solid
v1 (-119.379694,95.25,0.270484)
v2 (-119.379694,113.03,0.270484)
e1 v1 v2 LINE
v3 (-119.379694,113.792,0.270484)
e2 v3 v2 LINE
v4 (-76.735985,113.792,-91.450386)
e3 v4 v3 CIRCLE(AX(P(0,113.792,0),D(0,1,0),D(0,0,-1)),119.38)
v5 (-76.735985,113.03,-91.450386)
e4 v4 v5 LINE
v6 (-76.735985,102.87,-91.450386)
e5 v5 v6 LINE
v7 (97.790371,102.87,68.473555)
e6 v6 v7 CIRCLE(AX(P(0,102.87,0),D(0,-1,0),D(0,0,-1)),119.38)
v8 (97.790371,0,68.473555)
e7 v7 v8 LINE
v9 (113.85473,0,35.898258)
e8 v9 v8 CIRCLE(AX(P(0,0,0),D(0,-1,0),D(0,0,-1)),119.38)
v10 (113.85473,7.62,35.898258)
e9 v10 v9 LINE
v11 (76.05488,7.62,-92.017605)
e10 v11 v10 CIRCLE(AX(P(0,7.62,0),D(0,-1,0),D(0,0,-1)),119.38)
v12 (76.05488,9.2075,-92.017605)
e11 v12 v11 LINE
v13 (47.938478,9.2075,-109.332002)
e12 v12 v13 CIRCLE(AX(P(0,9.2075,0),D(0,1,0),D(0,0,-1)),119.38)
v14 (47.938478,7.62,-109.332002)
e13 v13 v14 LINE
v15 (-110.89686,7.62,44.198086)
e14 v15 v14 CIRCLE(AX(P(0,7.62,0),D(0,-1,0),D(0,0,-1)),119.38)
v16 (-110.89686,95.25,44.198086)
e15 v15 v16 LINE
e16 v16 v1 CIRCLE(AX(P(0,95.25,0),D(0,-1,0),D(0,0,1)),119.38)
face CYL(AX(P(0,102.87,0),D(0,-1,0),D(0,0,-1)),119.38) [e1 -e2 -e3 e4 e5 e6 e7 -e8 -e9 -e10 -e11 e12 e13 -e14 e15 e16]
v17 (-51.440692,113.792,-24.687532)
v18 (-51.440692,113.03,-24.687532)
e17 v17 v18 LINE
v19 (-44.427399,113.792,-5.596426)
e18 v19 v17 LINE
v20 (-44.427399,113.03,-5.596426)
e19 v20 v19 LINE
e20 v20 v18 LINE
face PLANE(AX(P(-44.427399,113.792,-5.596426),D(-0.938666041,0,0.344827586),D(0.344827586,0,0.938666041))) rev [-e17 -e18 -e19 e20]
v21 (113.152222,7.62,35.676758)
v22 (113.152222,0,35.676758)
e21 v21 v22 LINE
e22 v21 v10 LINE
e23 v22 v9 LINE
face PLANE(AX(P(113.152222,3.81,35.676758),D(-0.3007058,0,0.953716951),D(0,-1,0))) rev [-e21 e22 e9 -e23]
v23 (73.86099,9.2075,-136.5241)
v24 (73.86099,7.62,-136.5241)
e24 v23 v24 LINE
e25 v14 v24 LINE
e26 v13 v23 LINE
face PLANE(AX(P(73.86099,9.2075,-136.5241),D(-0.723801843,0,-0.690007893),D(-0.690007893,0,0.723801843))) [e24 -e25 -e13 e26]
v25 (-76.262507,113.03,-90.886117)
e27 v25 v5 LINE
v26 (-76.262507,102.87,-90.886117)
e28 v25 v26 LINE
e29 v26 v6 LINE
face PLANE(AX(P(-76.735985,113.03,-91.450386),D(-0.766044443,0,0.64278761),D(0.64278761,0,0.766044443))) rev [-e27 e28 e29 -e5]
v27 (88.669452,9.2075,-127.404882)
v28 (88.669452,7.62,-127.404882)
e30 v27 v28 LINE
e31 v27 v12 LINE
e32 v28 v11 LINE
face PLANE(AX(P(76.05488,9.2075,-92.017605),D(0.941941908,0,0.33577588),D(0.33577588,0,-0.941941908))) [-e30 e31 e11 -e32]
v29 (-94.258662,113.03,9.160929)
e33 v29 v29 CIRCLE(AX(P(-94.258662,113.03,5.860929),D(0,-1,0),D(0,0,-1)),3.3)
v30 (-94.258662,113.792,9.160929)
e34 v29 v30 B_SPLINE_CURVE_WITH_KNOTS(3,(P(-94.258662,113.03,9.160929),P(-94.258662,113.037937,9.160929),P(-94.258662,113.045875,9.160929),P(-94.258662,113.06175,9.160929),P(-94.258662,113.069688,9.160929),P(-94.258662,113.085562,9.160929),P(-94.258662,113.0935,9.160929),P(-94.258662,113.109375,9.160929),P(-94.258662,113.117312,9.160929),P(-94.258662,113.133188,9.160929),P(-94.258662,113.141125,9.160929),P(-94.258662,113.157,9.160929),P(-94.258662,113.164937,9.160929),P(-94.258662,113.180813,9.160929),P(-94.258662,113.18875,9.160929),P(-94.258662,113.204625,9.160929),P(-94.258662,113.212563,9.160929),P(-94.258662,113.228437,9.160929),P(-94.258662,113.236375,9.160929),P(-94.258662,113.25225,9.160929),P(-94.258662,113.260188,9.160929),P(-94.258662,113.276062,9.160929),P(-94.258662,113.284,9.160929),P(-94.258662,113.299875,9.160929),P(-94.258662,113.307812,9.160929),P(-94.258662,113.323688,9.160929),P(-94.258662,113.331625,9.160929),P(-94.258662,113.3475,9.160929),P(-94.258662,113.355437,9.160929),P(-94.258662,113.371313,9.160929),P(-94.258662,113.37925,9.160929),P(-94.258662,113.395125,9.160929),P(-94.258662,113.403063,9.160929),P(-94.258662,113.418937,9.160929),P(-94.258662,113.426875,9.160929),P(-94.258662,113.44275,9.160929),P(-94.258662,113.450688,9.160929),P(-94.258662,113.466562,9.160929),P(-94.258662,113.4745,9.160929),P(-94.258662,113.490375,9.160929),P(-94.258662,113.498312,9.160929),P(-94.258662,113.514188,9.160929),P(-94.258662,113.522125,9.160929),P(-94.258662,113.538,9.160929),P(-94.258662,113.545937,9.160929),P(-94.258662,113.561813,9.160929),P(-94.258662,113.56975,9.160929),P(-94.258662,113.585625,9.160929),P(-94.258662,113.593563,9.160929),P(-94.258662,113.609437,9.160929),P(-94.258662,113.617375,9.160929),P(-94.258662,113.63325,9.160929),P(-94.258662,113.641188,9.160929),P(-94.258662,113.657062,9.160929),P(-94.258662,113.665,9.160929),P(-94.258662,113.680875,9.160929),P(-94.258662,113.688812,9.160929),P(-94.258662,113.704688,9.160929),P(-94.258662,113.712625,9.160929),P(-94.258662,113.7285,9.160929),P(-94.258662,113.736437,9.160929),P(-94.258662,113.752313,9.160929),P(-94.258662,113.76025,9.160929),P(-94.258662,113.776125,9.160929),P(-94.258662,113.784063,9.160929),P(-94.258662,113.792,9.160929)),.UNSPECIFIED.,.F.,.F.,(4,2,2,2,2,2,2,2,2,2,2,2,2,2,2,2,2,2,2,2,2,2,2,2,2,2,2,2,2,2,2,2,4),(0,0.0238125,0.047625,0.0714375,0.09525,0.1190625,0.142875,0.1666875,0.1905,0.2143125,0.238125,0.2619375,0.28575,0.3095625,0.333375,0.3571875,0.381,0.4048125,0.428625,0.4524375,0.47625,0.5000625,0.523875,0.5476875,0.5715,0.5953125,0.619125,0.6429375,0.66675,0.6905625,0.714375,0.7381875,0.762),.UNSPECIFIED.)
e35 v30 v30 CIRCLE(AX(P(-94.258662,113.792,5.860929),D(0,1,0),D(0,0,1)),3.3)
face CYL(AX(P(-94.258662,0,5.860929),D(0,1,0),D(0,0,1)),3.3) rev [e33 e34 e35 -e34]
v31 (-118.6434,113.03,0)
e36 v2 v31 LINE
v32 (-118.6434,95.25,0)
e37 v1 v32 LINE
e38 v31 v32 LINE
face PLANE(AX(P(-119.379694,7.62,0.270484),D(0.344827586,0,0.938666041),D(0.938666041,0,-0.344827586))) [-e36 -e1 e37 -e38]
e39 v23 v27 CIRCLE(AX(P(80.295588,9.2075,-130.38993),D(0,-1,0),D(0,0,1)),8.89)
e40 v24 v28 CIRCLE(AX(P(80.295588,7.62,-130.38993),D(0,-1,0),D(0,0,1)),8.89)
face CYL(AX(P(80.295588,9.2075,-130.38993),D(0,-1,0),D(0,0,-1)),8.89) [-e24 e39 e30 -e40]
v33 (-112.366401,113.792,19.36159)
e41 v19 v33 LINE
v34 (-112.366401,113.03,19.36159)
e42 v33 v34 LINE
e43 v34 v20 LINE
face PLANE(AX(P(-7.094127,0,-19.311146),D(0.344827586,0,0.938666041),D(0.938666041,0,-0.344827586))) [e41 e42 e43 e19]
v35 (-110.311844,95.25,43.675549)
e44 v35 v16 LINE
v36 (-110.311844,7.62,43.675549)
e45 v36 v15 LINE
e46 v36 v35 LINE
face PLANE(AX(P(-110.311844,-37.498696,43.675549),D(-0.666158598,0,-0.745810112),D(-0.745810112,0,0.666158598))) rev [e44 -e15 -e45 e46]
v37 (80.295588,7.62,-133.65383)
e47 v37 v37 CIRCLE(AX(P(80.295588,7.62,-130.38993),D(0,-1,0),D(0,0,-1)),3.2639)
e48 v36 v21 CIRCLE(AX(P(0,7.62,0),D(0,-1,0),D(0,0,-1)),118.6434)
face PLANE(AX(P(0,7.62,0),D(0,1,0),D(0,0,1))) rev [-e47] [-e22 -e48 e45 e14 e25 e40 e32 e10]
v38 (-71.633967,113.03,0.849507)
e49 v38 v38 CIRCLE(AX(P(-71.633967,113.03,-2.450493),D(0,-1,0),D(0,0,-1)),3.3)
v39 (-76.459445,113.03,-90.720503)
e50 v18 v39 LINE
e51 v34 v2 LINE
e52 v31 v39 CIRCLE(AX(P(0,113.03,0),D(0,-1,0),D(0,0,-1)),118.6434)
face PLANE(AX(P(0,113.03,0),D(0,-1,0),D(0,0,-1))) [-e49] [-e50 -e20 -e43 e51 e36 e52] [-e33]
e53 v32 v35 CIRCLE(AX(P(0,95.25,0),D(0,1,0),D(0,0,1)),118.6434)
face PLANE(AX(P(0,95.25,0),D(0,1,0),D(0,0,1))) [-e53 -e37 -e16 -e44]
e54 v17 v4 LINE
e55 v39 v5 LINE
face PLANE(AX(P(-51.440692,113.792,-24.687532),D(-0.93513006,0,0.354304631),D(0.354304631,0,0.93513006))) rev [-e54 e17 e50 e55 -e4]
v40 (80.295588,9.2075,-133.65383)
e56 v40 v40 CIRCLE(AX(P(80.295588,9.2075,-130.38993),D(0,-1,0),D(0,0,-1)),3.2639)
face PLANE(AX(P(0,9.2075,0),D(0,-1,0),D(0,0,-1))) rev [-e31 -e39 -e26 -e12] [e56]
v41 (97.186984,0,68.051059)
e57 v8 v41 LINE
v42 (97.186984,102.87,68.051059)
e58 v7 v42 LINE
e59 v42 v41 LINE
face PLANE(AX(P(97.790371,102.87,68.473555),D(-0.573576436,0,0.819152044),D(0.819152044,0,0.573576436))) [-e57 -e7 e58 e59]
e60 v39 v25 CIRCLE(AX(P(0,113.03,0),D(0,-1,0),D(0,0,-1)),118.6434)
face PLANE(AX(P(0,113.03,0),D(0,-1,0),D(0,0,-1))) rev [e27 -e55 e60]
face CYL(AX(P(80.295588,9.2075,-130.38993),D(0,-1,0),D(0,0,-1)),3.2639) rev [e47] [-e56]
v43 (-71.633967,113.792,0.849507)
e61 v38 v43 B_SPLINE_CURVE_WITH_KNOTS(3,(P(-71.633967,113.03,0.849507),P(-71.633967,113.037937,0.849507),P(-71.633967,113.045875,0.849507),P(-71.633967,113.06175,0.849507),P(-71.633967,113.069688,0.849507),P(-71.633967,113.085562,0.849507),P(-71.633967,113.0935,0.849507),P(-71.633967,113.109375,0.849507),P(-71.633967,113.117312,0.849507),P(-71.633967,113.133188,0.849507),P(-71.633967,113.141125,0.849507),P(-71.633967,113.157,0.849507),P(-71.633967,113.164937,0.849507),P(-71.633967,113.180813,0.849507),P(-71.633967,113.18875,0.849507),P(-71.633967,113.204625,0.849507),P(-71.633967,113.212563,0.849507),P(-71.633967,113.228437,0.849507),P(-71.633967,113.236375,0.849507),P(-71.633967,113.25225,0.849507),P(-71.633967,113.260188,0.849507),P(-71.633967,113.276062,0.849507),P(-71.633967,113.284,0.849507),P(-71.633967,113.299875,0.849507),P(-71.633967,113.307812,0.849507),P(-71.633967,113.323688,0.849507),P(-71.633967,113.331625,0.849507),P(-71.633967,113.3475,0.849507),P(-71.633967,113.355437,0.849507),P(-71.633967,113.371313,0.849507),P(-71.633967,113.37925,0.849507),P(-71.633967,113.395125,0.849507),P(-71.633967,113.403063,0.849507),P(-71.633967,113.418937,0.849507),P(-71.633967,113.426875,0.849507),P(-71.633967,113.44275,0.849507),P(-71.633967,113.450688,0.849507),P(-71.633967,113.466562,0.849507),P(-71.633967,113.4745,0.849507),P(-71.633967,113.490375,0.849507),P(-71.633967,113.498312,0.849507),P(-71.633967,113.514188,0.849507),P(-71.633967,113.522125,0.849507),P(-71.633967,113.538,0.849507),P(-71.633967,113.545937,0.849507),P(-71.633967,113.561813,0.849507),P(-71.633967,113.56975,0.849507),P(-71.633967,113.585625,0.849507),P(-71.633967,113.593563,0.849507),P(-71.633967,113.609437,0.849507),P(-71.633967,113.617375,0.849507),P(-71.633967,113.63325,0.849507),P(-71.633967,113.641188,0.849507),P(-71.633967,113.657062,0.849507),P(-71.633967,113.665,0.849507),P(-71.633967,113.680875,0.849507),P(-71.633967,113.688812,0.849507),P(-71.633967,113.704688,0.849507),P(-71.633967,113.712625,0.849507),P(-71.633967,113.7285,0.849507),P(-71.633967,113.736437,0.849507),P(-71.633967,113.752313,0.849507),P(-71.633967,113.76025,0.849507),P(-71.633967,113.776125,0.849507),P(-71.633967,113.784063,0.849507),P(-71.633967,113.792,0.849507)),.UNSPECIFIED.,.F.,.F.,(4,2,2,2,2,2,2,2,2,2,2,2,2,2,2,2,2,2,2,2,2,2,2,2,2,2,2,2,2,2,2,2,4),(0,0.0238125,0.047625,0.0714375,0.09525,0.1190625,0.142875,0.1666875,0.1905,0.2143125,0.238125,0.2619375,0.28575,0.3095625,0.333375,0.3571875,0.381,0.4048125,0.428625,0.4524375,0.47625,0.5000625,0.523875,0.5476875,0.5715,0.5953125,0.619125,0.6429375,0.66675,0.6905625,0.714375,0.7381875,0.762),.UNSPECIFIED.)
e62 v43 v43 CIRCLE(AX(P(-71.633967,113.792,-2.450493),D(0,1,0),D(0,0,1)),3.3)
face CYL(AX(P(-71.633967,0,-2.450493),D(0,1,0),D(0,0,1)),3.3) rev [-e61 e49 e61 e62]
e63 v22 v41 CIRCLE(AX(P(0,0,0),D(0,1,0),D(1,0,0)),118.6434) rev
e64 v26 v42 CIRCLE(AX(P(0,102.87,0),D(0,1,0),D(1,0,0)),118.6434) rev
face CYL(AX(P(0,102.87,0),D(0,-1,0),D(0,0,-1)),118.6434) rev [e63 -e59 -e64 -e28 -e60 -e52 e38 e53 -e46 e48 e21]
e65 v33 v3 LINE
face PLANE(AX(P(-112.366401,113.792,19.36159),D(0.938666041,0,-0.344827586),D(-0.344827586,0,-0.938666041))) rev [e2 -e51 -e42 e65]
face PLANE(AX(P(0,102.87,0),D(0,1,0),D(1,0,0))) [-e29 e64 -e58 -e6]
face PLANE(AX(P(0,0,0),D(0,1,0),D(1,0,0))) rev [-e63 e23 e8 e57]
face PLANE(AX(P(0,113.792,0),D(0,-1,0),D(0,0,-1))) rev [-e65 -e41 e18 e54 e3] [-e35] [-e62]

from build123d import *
from build123d.topology import SkipClean

# Parameters (mm, degrees)
BASE_FLANGE1_DEPTH   = 102.87
CUT_EXTRUDE1_START   = -7.62
CUT_EXTRUDE1_DEPTH   = 7.62
BOSS_EXTRUDE5_START  = -95.25
BOSS_EXTRUDE5_DEPTH  = 95.25
BOSS_EXTRUDE6_DEPTH  = 10.16
BOSS_EXTRUDE7_DEPTH  = 0.762
SKETCH12_W           = 72.378245623
SKETCH12_H           = 0.762
BOSS_EXTRUDE8_DEPTH  = 20.33854962
SKETCH13_R           = 3.3
CUT_EXTRUDE2_DEPTH   = 204.597121983
SKETCH15_R           = 3.2639
BOSS_EXTRUDE10_DEPTH = 1.5875
BOSS_EXTRUDE11_START = 17.78
BOSS_EXTRUDE11_DEPTH = 87.63


# Read off the part's stored shape, not the designer's step: Cut-Extrude1
# Sheet-metal steps are written as plain solids
with BuildPart() as part:
    # Sketch2 → Base-Flange1 (new body)
    with BuildSketch(Plane(origin=(0, 0, 0), x_dir=(1, 0, 0), z_dir=(0, 1, 0))):
        with BuildLine():
            ThreePointArc((-119.38, 0), (35.898258345, 113.85472958), (97.790371047, -68.473554972))
            Line((97.790371047, -68.473554972), (97.186983651, -68.051058569))
            ThreePointArc((97.186983651, -68.051058569), (35.676758453, 113.152221674), (-118.6434, 0))
            Line((-118.6434, 0), (-119.38, 0))
        make_face()
    extrude(amount=BASE_FLANGE1_DEPTH)

    # Cut-Extrude1 outline → Cut-Extrude1 (cut)
    with BuildSketch(Plane.XZ.offset(CUT_EXTRUDE1_START)):
        with BuildLine():
            ThreePointArc((-119.38, 0), (18.160489843, -117.990597119), (113.85472958, 35.898258345))
            Line((113.85472958, 35.898258345), (113.152221674, 35.676758453))
            ThreePointArc((113.152221674, 35.676758453), (18.048435757, -117.262570031), (-118.6434, 0))
            Line((-118.6434, 0), (-119.38, 0))
        make_face()
    extrude(amount=CUT_EXTRUDE1_DEPTH, mode=Mode.SUBTRACT)

    # Sketch9 → Boss-Extrude5 (add)
    with BuildSketch(Plane(origin=(0, 102.87, 0), x_dir=(1, 0, 0), z_dir=(0, 1, 0)).offset(BOSS_EXTRUDE5_START)):
        with BuildLine():
            Line((-119.379693576, -0.270484204), (-118.6434, 0))
            Line((-118.6434, 0), (-119.38, 0))
            ThreePointArc((-119.38, 0), (-119.379923394, -0.135242189), (-119.379693576, -0.270484204))
        make_face()
    extrude(amount=BOSS_EXTRUDE5_DEPTH)

    # Sketch10 → Boss-Extrude6 (add)
    with SkipClean():  # the faces are left unmerged after this step: merging them gives an invalid solid
        with BuildSketch(Plane(origin=(0, 102.87, 0), x_dir=(1, 0, 0), z_dir=(0, 1, 0))):
            with BuildLine():
                Line((-119.379693576, -0.270484204), (-118.6434, 0))
                ThreePointArc((-118.6434, 0), (-107.527437301, 50.140867475), (-76.262507491, 90.886117283))
                Line((-76.262507491, 90.886117283), (-76.735984844, 91.45038562))
                ThreePointArc((-76.735984844, 91.45038562), (-108.252110006, 50.329564663), (-119.379693576, -0.270484204))
            make_face()
        extrude(amount=BOSS_EXTRUDE6_DEPTH)

    # Sketch11 → Boss-Extrude7 (add)
    with SkipClean():  # the faces are left unmerged after this step: merging them gives an invalid solid
        with BuildSketch(Plane(origin=(0, 113.03, 0), x_dir=(1, 0, 0), z_dir=(0, 1, 0))):
            with BuildLine():
                Line((-119.379693576, -0.270484204), (-51.440692331, 24.687531528))
                Line((-51.440692331, 24.687531528), (-76.735984844, 91.45038562))
                ThreePointArc((-76.735984844, 91.45038562), (-108.252110006, 50.329564663), (-119.379693576, -0.270484204))
            make_face()
        extrude(amount=BOSS_EXTRUDE7_DEPTH)

    # Sketch12 → Boss-Extrude8 (add)
    with SkipClean():  # the faces are left unmerged after this step: merging them gives an invalid solid
        with BuildSketch(Plane(origin=(-14.107419738, 0, -38.402251904), x_dir=(0.9386660406079884, 0, -0.3448275862069655), z_dir=(0.3448275862069655, 0, 0.9386660406079884))):
            with Locations((-75.961811901, 113.411)):
                Rectangle(SKETCH12_W, SKETCH12_H)
        extrude(amount=BOSS_EXTRUDE8_DEPTH)

    # Sketch13 → Cut-Extrude2 (cut, through all)
    with SkipClean():  # the faces are left unmerged after this step: merging them gives an invalid solid
        with BuildSketch(Plane(origin=(0, 113.792, 0), x_dir=(1, 0, 0), z_dir=(0, 1, 0))):
            with Locations(Location((-94.258662261, -5.860928581, 0), (0, 0, 270))):
                Circle(SKETCH13_R)
            with Locations(Location((-71.633967235, 2.450493285, 0), (0, 0, 270))):
                Circle(SKETCH13_R)
        extrude(amount=-CUT_EXTRUDE2_DEPTH, mode=Mode.SUBTRACT)

    # Sketch15 → Boss-Extrude10 (add)
    with SkipClean():  # the faces are left unmerged after this step: merging them gives an invalid solid
        with BuildSketch(Plane.XZ.offset(-7.62)):
            with BuildLine():
                Line((76.054879624, -92.017605302), (88.669451617, -127.404882133))
                ThreePointArc((88.669451617, -127.404882133), (84.957156503, -137.959730204), (73.860989671, -136.524099874))
                Line((73.860989671, -136.524099874), (47.938477772, -109.332002401))
                ThreePointArc((47.938477772, -109.332002401), (62.598204897, -101.651606695), (76.054879624, -92.017605302))
            make_face()
            with Locations(Location((80.295588053, -130.389929705, 0), (0, 0, 270))):
                Circle(SKETCH15_R, mode=Mode.SUBTRACT)
        extrude(amount=-BOSS_EXTRUDE10_DEPTH)

    # Sketch16 → Boss-Extrude11 (add)
    with SkipClean():  # the faces are left unmerged after this step: merging them gives an invalid solid
        with BuildSketch(Plane.XZ.offset(-113.03).offset(BOSS_EXTRUDE11_START)):
            with BuildLine():
                Line((-119.379693576, 0.270484204), (-118.6434, 0))
                ThreePointArc((-118.6434, 0), (-116.541899203, 22.231556259), (-110.311843526, 43.675548554))
                Line((-110.311843526, 43.675548554), (-110.896860103, 44.19808615))
                ThreePointArc((-110.896860103, 44.19808615), (-117.21446731, 22.635217102), (-119.379693576, 0.270484204))
            make_face()
        extrude(amount=BOSS_EXTRUDE11_DEPTH)


solid = part.part
